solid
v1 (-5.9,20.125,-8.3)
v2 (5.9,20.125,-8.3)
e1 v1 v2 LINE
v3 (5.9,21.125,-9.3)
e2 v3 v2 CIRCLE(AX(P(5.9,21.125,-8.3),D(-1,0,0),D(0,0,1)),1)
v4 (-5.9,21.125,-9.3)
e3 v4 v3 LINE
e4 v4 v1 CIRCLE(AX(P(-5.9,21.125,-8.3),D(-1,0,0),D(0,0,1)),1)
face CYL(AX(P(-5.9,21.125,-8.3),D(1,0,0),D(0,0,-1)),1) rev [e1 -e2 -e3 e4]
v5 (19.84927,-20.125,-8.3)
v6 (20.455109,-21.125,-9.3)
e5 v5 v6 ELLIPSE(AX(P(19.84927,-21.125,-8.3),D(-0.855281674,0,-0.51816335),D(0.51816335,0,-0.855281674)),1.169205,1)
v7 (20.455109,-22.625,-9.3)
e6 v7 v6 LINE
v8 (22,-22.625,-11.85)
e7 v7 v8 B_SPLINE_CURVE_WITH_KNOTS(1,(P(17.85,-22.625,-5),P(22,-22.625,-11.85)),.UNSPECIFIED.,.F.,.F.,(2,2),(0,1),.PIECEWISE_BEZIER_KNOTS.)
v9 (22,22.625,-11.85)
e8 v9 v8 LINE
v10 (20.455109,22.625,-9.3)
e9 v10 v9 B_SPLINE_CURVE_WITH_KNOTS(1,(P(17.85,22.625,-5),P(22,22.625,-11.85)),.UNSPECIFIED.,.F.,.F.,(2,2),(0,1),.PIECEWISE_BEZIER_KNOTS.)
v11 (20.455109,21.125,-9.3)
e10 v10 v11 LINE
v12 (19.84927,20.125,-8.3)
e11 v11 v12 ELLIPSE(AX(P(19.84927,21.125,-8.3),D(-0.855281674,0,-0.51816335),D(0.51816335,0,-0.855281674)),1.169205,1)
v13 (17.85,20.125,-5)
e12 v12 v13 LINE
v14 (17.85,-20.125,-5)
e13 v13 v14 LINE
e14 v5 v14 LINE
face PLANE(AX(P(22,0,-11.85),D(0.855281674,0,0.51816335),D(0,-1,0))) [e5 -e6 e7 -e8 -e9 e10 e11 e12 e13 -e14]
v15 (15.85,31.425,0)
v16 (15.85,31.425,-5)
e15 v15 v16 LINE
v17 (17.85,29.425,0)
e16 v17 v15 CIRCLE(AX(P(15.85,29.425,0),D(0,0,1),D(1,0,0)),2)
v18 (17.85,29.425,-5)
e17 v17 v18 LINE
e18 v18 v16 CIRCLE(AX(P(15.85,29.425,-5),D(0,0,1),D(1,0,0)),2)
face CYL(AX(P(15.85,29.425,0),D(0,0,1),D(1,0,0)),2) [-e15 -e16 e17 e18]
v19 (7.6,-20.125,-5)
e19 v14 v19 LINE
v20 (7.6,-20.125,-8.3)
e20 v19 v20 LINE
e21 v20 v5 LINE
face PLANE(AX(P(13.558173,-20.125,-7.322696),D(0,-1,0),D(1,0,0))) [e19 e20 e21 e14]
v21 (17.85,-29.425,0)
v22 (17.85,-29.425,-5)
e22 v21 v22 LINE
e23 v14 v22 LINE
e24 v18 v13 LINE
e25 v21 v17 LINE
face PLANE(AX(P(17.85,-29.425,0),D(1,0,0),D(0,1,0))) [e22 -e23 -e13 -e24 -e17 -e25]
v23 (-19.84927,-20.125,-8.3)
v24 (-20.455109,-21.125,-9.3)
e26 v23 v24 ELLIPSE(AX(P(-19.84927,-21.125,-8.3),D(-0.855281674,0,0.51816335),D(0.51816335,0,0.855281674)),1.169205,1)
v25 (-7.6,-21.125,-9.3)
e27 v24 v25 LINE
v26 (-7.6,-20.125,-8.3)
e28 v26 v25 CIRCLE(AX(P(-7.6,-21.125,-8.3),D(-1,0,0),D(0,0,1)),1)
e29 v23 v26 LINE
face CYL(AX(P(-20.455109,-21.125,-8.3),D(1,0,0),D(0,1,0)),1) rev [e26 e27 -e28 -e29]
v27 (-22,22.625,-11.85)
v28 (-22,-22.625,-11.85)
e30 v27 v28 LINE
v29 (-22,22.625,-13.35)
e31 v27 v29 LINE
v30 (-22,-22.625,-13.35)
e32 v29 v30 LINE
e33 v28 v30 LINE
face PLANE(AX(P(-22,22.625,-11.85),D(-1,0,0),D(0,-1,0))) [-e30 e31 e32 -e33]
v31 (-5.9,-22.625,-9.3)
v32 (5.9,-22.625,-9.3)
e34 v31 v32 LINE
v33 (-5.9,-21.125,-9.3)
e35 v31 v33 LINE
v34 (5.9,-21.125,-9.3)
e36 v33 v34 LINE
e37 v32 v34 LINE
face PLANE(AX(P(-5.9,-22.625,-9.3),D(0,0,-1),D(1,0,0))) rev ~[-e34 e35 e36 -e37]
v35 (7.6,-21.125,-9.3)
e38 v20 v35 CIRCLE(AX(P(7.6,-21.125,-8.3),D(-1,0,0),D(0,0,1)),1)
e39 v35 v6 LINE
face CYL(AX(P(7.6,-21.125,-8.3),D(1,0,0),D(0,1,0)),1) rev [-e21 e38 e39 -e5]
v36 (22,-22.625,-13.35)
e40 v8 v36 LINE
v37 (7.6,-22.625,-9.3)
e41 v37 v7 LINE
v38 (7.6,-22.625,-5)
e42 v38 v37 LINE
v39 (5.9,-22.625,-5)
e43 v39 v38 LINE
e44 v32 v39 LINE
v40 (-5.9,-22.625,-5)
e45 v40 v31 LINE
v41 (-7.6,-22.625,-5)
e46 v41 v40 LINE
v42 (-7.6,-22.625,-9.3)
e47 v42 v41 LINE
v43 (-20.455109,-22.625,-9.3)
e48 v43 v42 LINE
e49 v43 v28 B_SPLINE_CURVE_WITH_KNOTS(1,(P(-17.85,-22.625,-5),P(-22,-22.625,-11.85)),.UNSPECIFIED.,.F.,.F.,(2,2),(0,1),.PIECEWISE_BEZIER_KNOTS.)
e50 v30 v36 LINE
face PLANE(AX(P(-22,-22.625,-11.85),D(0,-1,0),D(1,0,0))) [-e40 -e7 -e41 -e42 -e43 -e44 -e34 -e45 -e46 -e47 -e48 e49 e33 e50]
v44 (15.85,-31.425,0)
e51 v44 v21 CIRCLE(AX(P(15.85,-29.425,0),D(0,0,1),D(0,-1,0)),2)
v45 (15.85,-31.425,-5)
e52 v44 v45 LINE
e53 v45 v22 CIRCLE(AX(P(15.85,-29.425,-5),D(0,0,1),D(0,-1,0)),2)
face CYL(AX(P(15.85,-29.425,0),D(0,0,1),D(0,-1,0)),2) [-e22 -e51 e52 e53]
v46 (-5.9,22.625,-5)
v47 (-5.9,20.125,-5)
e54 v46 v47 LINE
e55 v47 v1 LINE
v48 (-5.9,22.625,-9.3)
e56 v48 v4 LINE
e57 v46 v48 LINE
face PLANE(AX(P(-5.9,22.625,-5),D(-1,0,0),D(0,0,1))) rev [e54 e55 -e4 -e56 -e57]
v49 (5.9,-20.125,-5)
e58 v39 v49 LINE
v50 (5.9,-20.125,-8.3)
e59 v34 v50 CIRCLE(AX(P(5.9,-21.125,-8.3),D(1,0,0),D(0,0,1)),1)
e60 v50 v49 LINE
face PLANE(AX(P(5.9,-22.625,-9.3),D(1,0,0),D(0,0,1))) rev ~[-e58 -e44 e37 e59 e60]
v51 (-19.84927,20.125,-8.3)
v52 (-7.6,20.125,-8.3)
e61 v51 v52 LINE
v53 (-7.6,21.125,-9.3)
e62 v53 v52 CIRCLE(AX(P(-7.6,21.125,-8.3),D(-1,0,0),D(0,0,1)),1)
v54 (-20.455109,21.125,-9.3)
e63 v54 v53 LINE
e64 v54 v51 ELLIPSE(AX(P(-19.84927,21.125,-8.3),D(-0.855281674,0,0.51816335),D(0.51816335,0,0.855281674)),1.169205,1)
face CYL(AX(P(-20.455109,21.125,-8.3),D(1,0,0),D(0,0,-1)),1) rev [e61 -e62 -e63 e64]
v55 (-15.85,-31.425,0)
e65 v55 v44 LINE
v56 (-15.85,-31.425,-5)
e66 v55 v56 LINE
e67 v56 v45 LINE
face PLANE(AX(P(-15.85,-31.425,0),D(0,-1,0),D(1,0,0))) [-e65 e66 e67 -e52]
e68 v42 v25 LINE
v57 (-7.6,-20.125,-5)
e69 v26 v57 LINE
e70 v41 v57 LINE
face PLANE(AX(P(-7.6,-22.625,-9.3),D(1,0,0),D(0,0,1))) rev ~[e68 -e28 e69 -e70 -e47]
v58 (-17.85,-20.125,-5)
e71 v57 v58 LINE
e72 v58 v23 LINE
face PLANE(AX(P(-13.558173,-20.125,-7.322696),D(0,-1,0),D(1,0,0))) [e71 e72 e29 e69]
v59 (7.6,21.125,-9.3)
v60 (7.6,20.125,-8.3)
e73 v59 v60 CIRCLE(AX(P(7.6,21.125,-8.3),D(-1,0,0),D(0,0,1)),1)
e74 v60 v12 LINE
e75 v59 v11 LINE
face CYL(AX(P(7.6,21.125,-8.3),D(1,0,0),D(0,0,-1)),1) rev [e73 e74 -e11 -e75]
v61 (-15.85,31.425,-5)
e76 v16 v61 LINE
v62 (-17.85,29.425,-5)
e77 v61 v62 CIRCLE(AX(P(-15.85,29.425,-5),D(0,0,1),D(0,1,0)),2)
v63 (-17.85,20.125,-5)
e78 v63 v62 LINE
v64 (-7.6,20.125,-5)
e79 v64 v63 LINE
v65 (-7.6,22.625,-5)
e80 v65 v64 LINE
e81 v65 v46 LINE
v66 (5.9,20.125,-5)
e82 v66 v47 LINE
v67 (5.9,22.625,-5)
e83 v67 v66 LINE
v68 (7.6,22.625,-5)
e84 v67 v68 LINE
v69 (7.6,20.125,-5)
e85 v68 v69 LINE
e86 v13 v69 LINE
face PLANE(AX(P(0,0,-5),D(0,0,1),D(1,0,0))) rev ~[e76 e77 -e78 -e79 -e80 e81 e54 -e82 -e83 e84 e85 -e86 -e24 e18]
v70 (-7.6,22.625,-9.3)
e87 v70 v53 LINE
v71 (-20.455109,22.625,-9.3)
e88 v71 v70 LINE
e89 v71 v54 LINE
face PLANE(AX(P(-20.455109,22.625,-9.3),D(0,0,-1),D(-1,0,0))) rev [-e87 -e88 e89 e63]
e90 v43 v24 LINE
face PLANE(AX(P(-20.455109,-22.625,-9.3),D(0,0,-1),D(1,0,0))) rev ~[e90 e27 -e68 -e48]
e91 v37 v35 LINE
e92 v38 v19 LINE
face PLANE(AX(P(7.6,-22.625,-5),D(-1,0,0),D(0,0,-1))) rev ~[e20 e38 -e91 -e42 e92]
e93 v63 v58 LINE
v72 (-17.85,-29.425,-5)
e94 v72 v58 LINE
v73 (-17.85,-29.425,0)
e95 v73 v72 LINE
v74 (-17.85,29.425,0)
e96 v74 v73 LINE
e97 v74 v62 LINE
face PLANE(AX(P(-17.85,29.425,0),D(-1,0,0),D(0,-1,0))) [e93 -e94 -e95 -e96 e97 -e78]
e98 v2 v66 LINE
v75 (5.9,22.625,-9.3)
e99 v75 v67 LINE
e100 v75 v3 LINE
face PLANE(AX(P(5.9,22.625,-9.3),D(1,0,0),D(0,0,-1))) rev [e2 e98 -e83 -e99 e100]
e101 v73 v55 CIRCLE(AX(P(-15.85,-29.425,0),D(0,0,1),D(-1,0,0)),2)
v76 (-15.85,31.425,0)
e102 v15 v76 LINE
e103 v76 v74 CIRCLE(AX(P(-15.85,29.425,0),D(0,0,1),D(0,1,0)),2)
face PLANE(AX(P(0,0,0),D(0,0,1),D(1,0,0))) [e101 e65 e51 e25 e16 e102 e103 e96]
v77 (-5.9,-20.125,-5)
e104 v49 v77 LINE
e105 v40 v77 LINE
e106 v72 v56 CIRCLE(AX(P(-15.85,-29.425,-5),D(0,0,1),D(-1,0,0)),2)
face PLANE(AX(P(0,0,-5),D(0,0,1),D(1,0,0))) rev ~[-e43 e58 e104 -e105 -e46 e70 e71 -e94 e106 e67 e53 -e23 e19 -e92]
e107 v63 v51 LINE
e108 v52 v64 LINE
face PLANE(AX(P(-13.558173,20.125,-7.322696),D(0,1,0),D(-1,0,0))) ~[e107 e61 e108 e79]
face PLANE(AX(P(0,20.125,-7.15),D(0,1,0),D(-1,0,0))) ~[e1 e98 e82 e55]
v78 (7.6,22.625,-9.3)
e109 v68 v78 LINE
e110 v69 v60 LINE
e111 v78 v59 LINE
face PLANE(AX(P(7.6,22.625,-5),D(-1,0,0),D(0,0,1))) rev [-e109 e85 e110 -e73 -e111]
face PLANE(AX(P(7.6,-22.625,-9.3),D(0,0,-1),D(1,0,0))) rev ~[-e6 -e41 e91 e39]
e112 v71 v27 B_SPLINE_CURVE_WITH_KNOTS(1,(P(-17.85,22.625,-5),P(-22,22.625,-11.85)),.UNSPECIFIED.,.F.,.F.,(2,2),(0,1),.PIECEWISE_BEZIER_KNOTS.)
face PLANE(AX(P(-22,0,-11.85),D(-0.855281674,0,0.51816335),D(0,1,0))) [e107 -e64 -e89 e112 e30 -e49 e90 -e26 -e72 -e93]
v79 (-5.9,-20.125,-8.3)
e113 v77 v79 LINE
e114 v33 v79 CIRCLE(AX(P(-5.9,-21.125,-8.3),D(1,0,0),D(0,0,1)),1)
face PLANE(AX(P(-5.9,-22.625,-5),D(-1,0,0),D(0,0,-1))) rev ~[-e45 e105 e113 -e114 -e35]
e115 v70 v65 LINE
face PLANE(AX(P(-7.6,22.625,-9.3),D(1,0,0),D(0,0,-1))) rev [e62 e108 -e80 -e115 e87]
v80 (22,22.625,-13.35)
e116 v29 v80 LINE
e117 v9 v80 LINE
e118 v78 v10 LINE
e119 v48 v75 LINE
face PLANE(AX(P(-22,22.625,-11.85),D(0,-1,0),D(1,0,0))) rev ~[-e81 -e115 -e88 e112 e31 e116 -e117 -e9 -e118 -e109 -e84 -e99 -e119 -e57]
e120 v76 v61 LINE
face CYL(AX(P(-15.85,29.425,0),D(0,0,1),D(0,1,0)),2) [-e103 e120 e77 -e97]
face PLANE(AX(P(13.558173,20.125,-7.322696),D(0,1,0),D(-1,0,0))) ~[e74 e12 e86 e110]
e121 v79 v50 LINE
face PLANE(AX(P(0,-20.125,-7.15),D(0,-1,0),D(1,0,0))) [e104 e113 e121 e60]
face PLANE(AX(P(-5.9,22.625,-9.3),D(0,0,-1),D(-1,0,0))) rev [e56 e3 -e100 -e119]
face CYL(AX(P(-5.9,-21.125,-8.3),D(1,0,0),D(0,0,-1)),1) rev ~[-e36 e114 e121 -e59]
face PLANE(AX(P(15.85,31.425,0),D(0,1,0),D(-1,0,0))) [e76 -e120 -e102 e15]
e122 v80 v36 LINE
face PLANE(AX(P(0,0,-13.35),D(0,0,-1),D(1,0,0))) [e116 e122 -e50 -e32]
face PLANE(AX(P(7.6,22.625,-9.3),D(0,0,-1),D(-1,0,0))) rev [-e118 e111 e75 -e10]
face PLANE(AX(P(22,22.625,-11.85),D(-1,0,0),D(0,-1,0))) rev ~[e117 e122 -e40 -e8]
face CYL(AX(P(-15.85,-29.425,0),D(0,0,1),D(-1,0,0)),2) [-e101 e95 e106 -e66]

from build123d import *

# Parameters (mm, degrees)
F1_DEPTH = 5
F2_W     = 35.7
F2_H     = 45.25
F4_W     = 44
F4_H     = 45.25
F6_DEPTH = 1.5
F8_DEPTH = 2.5
F9_R     = 1


# Not quite as in the source:
# - a pattern or mirror of a feature is missing from the dataset's text; its kind, count and spacing are read off the source's solid


with BuildPart() as f1:
    # F0 (on Top) → F1 (new body)
    with BuildSketch(Plane.XY):
        with BuildLine():
            Line((-15.85, -31.425), (15.85, -31.425))
            ThreePointArc((15.85, -31.425), (17.2642135624, -30.8392135624), (17.85, -29.425))
            Line((17.85, -29.425), (17.85, 29.425))
            ThreePointArc((17.85, 29.425), (17.2642135624, 30.8392135624), (15.85, 31.425))
            Line((15.85, 31.425), (-15.85, 31.425))
            ThreePointArc((-15.85, 31.425), (-17.2642135624, 30.8392135624), (-17.85, 29.425))
            Line((-17.85, 29.425), (-17.85, -29.425))
            ThreePointArc((-17.85, -29.425), (-17.2642135624, -30.8392135624), (-15.85, -31.425))
        make_face()
    extrude(amount=-F1_DEPTH)

    # F2 (on face) → F5 section 0
    with BuildSketch(Plane(origin=(0, 0, -5), x_dir=(1, 0, 0), z_dir=(0, 0, -1))):
        Rectangle(F2_W, F2_H)
    # F4 (on offset) → F5 section 1
    with BuildSketch(Plane(origin=(0, 0, -11.85), x_dir=(1, 0, 0), z_dir=(0, 0, -1))):
        Rectangle(F4_W, F4_H)
    loft()

    # F4 (on offset) → F6 (join)
    with BuildSketch(Plane(origin=(0, 0, -11.85), x_dir=(1, 0, 0), z_dir=(0, 0, -1))):
        Rectangle(F4_W, F4_H)
    extrude(amount=F6_DEPTH)

    # F7 (on face) → F8 (cut)
    with BuildSketch(Plane.XZ.offset(22.625)):
        Polygon((5.9, -5), (0, -5), (-5.9, -5), (-5.9, -9.3), (0, -9.3), (5.9, -9.3), align=None)
        Polygon((-7.6, -9.3), (-7.6, -5), (-17.85, -5), (-20.4551094891, -9.3), align=None)
        Polygon((17.85, -5), (7.6, -5), (7.6, -9.3), (20.4551094891, -9.3), align=None)
    f8 = extrude(amount=-F8_DEPTH, mode=Mode.SUBTRACT)

    # F8_copies: F8 across plane
    add(f8.mirror(Plane.ZX), mode=Mode.SUBTRACT)

    # F9
    f9_edges = [f1.edges().sort_by_distance(p)[0] for p in [
        (-14.027555, -20.125, -9.3),
        (0, -20.125, -9.3),
        (14.027555, -20.125, -9.3),
        (14.027555, 20.125, -9.3),
        (0, 20.125, -9.3),
        (-14.027555, 20.125, -9.3),
    ]]
    fillet(f9_edges, radius=F9_R)


solid = f1.part
